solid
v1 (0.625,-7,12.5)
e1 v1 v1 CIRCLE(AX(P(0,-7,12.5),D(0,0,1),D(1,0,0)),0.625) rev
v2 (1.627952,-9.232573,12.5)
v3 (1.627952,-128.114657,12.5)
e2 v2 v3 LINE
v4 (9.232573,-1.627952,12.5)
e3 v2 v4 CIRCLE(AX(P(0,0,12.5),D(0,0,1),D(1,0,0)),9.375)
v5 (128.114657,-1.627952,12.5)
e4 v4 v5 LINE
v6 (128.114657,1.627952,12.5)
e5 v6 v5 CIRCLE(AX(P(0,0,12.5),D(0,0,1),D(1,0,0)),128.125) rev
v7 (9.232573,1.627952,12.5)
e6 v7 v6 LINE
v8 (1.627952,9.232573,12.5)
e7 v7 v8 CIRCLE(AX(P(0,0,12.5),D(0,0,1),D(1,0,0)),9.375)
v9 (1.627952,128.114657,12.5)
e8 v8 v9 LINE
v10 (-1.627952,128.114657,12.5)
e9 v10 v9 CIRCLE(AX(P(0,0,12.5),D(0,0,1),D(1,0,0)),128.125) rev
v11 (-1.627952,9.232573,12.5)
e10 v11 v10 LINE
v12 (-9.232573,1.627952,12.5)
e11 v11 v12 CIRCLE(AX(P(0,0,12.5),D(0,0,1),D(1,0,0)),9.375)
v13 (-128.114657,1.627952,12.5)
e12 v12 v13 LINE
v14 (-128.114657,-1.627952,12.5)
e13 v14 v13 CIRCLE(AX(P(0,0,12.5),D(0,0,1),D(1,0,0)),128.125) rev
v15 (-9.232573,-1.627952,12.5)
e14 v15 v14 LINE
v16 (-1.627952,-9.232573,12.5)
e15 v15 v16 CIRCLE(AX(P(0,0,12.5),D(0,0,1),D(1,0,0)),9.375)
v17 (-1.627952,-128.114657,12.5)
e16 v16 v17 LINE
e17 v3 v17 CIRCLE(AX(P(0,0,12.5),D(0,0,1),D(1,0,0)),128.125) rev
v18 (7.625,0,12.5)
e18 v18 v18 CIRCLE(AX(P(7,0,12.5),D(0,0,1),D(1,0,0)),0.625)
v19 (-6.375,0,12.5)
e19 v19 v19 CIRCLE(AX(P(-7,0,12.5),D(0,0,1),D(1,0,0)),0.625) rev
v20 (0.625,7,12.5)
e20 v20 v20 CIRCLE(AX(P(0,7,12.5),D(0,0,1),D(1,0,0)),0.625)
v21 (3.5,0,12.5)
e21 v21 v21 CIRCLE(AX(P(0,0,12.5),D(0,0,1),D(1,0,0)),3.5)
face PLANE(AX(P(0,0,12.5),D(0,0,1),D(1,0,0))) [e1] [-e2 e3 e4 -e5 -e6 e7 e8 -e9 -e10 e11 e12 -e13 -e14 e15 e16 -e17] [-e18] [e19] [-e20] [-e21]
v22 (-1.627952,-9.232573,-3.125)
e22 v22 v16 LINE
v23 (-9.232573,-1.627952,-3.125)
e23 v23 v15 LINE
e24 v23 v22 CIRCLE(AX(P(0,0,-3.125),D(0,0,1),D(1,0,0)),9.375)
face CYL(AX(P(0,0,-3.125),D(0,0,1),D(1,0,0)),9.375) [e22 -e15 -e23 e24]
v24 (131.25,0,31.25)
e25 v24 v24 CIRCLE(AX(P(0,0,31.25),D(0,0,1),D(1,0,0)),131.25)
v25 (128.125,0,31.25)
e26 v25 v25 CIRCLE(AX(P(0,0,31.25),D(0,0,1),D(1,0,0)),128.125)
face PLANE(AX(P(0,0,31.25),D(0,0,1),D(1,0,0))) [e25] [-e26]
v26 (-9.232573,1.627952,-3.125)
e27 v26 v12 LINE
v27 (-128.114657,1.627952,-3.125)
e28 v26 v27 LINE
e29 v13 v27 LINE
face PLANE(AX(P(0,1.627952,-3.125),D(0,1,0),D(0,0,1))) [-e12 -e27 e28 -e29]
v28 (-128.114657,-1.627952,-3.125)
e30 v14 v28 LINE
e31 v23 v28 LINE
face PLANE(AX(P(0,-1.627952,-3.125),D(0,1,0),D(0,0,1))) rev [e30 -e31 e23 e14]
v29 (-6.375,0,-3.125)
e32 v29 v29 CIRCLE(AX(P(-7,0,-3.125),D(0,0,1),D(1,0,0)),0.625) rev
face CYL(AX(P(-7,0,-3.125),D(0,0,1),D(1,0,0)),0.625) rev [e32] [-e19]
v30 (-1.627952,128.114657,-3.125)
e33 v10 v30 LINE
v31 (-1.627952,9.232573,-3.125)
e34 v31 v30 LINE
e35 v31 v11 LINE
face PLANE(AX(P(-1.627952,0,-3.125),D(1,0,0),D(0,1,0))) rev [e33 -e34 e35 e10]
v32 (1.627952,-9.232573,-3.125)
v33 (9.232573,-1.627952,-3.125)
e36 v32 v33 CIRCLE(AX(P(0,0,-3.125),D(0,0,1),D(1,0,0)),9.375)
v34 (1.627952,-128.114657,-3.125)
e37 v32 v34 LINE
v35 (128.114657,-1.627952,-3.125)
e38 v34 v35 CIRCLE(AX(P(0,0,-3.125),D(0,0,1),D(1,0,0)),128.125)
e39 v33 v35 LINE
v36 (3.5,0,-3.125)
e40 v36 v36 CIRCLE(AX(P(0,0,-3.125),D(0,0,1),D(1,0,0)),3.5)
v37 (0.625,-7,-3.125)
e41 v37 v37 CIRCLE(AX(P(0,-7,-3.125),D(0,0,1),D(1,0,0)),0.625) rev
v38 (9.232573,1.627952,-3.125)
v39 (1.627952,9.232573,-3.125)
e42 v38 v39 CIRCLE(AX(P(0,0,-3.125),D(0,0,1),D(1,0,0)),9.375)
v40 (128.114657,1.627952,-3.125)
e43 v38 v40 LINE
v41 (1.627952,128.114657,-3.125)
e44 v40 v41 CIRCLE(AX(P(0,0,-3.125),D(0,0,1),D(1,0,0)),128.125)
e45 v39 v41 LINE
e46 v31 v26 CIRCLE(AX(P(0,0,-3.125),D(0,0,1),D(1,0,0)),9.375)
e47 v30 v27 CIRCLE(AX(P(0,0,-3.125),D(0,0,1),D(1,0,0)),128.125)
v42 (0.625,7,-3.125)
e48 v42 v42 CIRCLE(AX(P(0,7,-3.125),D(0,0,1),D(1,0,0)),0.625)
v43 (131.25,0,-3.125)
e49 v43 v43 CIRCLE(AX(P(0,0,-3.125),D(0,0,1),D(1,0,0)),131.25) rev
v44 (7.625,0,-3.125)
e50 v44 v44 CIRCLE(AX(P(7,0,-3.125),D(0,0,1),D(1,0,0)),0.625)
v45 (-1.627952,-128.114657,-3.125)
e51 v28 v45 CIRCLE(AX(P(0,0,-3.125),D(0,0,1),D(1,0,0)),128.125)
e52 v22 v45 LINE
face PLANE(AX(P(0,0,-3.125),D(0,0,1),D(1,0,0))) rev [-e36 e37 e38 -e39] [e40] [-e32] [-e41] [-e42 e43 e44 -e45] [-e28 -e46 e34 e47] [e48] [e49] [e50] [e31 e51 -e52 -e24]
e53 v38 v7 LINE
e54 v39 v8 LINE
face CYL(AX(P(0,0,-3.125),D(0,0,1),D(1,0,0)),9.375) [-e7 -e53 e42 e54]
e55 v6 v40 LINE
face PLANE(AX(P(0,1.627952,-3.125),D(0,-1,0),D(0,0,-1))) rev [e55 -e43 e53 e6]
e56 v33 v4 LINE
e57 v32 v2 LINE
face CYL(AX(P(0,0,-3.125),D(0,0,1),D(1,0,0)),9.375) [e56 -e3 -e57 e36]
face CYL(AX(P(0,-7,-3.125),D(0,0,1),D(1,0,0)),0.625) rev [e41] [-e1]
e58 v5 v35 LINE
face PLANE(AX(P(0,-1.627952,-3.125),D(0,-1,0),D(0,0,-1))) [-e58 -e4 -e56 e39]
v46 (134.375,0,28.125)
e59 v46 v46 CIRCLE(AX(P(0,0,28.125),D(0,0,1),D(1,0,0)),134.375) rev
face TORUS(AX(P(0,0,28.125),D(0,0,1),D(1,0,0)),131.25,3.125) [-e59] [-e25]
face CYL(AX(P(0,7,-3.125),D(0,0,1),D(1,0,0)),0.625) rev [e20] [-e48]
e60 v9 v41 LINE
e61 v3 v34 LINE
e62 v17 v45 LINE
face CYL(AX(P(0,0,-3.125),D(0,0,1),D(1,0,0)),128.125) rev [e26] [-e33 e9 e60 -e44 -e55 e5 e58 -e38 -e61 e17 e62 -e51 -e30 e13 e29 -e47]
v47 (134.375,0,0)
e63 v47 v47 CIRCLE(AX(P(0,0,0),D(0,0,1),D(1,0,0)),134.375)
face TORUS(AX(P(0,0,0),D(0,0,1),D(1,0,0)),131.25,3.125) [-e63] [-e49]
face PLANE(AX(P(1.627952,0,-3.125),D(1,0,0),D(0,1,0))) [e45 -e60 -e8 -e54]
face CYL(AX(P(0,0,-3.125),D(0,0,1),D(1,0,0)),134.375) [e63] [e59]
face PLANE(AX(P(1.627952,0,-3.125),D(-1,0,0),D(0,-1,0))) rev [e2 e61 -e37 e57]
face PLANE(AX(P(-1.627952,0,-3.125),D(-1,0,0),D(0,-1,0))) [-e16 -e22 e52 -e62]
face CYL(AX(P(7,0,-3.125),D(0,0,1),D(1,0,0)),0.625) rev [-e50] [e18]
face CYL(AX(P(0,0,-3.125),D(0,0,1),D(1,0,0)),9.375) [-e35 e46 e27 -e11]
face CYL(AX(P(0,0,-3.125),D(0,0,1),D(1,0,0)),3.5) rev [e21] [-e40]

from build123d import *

# Parameters (mm, degrees)
BOSS_EXTRUDE1_DEPTH      = 50
BOSS_EXTRUDE1_DEPTH_BACK = 5
SKETCH2_R                = 215
SKETCH2_R_2              = 205
BOSS_EXTRUDE2_DEPTH      = 20
BOSS_EXTRUDE2_DEPTH_BACK = 5
SKETCH3_R                = 1
FILLET1_R                = 5
FILLET2_R                = 5
SCALE1_SCALE             = 0.625


with BuildPart() as part:
    # Sketch2 → Boss-Extrude1 (new, two sides: drawn at the far end of the back side and taken through both)
    with BuildSketch(Plane.XY.offset(-BOSS_EXTRUDE1_DEPTH_BACK)):
        Circle(SKETCH2_R)
        Circle(SKETCH2_R_2, mode=Mode.SUBTRACT)
    extrude(amount=BOSS_EXTRUDE1_DEPTH + BOSS_EXTRUDE1_DEPTH_BACK)

    # Sketch3 → Boss-Extrude2 (add, two sides: drawn at the far end of the back side and taken through both)
    with BuildSketch(Plane.XY.offset(-BOSS_EXTRUDE2_DEPTH_BACK)):
        with BuildLine():
            Line((210.976119612, 2.604722665), (14.772116295, 2.604722665))
            ThreePointArc((14.772116295, 2.604722665), (10.606601718, 10.606601718), (2.604722665, 14.772116295))
            Line((2.604722665, 14.772116295), (2.604722665, 210.976119612))
            Line((2.604722665, 210.976119612), (-2.604722665, 210.976119612))
            Line((-2.604722665, 210.976119612), (-2.604722665, 14.772116295))
            ThreePointArc((-2.604722665, 14.772116295), (-10.606601718, 10.606601718), (-14.772116295, 2.604722665))
            Line((-14.772116295, 2.604722665), (-210.976119612, 2.604722665))
            Line((-210.976119612, 2.604722665), (-210.976119612, -2.604722665))
            Line((-210.976119612, -2.604722665), (-14.772116295, -2.604722665))
            ThreePointArc((-14.772116295, -2.604722665), (-10.606601718, -10.606601718), (-2.604722665, -14.772116295))
            Line((-2.604722665, -14.772116295), (-2.604722665, -210.976119612))
            Line((-2.604722665, -210.976119612), (2.604722665, -210.976119612))
            Line((2.604722665, -210.976119612), (2.604722665, -14.772116295))
            ThreePointArc((2.604722665, -14.772116295), (10.606601718, -10.606601718), (14.772116295, -2.604722665))
            Line((14.772116295, -2.604722665), (210.976119612, -2.604722665))
            Line((210.976119612, -2.604722665), (210.976119612, 2.604722665))
        make_face()
        with Locations((0, -11.2)):
            Circle(SKETCH3_R, mode=Mode.SUBTRACT)
        with Locations((-11.2, 0)):
            Circle(SKETCH3_R, mode=Mode.SUBTRACT)
        with BuildLine():
            ThreePointArc((-5.514923417, -0.972429795), (-5.6, 0), (-5.514923417, 0.972429795))
            ThreePointArc((-5.514923417, 0.972429795), (-3.959797975, 3.959797975), (-0.972429795, 5.514923417))
            ThreePointArc((-0.972429795, 5.514923417), (0, 5.6), (0.972429795, 5.514923417))
            ThreePointArc((0.972429795, 5.514923417), (3.959797975, 3.959797975), (5.514923417, 0.972429795))
            ThreePointArc((5.514923417, 0.972429795), (5.578690309, 0.488072159), (5.6, 0))
            ThreePointArc((5.6, 0), (5.578690309, -0.488072159), (5.514923417, -0.972429795))
            ThreePointArc((5.514923417, -0.972429795), (3.959797975, -3.959797975), (0.972429795, -5.514923417))
            ThreePointArc((0.972429795, -5.514923417), (0, -5.6), (-0.972429795, -5.514923417))
            ThreePointArc((-0.972429795, -5.514923417), (-3.959797975, -3.959797975), (-5.514923417, -0.972429795))
        make_face(mode=Mode.SUBTRACT)
        with Locations((11.2, 0)):
            Circle(SKETCH3_R, mode=Mode.SUBTRACT)
        with Locations((0, 11.2)):
            Circle(SKETCH3_R, mode=Mode.SUBTRACT)
    extrude(amount=BOSS_EXTRUDE2_DEPTH + BOSS_EXTRUDE2_DEPTH_BACK)

    # Fillet1
    fillet1_edges = [part.edges().sort_by_distance(p)[0] for p in [
        (-215, 0, 50),
    ]]
    fillet(fillet1_edges, radius=FILLET1_R)

    # Fillet2
    # the kernel refuses this fillet: 5 mm, written as the material it takes off along each edge
    with BuildSketch(Plane(origin=(0, 0, -5), x_dir=(1, 0, 0), z_dir=(0, -1, 0))) as fillet2_piece_1:
        with BuildLine():
            CenterArc((215 - FILLET2_R, FILLET2_R), FILLET2_R, 270, 90)
            Line((215 - FILLET2_R, 0), (215, 0))
            Line((215, 0), (215, FILLET2_R))
        make_face()
    revolve(axis=Axis((0, 0, -5), (0, 0, 1)), mode=Mode.SUBTRACT)


with BuildPart() as part_1:
    # Scale1: scaled about (0, 0, 0)
    add(part.part.scale(SCALE1_SCALE))


solid = part_1.part
